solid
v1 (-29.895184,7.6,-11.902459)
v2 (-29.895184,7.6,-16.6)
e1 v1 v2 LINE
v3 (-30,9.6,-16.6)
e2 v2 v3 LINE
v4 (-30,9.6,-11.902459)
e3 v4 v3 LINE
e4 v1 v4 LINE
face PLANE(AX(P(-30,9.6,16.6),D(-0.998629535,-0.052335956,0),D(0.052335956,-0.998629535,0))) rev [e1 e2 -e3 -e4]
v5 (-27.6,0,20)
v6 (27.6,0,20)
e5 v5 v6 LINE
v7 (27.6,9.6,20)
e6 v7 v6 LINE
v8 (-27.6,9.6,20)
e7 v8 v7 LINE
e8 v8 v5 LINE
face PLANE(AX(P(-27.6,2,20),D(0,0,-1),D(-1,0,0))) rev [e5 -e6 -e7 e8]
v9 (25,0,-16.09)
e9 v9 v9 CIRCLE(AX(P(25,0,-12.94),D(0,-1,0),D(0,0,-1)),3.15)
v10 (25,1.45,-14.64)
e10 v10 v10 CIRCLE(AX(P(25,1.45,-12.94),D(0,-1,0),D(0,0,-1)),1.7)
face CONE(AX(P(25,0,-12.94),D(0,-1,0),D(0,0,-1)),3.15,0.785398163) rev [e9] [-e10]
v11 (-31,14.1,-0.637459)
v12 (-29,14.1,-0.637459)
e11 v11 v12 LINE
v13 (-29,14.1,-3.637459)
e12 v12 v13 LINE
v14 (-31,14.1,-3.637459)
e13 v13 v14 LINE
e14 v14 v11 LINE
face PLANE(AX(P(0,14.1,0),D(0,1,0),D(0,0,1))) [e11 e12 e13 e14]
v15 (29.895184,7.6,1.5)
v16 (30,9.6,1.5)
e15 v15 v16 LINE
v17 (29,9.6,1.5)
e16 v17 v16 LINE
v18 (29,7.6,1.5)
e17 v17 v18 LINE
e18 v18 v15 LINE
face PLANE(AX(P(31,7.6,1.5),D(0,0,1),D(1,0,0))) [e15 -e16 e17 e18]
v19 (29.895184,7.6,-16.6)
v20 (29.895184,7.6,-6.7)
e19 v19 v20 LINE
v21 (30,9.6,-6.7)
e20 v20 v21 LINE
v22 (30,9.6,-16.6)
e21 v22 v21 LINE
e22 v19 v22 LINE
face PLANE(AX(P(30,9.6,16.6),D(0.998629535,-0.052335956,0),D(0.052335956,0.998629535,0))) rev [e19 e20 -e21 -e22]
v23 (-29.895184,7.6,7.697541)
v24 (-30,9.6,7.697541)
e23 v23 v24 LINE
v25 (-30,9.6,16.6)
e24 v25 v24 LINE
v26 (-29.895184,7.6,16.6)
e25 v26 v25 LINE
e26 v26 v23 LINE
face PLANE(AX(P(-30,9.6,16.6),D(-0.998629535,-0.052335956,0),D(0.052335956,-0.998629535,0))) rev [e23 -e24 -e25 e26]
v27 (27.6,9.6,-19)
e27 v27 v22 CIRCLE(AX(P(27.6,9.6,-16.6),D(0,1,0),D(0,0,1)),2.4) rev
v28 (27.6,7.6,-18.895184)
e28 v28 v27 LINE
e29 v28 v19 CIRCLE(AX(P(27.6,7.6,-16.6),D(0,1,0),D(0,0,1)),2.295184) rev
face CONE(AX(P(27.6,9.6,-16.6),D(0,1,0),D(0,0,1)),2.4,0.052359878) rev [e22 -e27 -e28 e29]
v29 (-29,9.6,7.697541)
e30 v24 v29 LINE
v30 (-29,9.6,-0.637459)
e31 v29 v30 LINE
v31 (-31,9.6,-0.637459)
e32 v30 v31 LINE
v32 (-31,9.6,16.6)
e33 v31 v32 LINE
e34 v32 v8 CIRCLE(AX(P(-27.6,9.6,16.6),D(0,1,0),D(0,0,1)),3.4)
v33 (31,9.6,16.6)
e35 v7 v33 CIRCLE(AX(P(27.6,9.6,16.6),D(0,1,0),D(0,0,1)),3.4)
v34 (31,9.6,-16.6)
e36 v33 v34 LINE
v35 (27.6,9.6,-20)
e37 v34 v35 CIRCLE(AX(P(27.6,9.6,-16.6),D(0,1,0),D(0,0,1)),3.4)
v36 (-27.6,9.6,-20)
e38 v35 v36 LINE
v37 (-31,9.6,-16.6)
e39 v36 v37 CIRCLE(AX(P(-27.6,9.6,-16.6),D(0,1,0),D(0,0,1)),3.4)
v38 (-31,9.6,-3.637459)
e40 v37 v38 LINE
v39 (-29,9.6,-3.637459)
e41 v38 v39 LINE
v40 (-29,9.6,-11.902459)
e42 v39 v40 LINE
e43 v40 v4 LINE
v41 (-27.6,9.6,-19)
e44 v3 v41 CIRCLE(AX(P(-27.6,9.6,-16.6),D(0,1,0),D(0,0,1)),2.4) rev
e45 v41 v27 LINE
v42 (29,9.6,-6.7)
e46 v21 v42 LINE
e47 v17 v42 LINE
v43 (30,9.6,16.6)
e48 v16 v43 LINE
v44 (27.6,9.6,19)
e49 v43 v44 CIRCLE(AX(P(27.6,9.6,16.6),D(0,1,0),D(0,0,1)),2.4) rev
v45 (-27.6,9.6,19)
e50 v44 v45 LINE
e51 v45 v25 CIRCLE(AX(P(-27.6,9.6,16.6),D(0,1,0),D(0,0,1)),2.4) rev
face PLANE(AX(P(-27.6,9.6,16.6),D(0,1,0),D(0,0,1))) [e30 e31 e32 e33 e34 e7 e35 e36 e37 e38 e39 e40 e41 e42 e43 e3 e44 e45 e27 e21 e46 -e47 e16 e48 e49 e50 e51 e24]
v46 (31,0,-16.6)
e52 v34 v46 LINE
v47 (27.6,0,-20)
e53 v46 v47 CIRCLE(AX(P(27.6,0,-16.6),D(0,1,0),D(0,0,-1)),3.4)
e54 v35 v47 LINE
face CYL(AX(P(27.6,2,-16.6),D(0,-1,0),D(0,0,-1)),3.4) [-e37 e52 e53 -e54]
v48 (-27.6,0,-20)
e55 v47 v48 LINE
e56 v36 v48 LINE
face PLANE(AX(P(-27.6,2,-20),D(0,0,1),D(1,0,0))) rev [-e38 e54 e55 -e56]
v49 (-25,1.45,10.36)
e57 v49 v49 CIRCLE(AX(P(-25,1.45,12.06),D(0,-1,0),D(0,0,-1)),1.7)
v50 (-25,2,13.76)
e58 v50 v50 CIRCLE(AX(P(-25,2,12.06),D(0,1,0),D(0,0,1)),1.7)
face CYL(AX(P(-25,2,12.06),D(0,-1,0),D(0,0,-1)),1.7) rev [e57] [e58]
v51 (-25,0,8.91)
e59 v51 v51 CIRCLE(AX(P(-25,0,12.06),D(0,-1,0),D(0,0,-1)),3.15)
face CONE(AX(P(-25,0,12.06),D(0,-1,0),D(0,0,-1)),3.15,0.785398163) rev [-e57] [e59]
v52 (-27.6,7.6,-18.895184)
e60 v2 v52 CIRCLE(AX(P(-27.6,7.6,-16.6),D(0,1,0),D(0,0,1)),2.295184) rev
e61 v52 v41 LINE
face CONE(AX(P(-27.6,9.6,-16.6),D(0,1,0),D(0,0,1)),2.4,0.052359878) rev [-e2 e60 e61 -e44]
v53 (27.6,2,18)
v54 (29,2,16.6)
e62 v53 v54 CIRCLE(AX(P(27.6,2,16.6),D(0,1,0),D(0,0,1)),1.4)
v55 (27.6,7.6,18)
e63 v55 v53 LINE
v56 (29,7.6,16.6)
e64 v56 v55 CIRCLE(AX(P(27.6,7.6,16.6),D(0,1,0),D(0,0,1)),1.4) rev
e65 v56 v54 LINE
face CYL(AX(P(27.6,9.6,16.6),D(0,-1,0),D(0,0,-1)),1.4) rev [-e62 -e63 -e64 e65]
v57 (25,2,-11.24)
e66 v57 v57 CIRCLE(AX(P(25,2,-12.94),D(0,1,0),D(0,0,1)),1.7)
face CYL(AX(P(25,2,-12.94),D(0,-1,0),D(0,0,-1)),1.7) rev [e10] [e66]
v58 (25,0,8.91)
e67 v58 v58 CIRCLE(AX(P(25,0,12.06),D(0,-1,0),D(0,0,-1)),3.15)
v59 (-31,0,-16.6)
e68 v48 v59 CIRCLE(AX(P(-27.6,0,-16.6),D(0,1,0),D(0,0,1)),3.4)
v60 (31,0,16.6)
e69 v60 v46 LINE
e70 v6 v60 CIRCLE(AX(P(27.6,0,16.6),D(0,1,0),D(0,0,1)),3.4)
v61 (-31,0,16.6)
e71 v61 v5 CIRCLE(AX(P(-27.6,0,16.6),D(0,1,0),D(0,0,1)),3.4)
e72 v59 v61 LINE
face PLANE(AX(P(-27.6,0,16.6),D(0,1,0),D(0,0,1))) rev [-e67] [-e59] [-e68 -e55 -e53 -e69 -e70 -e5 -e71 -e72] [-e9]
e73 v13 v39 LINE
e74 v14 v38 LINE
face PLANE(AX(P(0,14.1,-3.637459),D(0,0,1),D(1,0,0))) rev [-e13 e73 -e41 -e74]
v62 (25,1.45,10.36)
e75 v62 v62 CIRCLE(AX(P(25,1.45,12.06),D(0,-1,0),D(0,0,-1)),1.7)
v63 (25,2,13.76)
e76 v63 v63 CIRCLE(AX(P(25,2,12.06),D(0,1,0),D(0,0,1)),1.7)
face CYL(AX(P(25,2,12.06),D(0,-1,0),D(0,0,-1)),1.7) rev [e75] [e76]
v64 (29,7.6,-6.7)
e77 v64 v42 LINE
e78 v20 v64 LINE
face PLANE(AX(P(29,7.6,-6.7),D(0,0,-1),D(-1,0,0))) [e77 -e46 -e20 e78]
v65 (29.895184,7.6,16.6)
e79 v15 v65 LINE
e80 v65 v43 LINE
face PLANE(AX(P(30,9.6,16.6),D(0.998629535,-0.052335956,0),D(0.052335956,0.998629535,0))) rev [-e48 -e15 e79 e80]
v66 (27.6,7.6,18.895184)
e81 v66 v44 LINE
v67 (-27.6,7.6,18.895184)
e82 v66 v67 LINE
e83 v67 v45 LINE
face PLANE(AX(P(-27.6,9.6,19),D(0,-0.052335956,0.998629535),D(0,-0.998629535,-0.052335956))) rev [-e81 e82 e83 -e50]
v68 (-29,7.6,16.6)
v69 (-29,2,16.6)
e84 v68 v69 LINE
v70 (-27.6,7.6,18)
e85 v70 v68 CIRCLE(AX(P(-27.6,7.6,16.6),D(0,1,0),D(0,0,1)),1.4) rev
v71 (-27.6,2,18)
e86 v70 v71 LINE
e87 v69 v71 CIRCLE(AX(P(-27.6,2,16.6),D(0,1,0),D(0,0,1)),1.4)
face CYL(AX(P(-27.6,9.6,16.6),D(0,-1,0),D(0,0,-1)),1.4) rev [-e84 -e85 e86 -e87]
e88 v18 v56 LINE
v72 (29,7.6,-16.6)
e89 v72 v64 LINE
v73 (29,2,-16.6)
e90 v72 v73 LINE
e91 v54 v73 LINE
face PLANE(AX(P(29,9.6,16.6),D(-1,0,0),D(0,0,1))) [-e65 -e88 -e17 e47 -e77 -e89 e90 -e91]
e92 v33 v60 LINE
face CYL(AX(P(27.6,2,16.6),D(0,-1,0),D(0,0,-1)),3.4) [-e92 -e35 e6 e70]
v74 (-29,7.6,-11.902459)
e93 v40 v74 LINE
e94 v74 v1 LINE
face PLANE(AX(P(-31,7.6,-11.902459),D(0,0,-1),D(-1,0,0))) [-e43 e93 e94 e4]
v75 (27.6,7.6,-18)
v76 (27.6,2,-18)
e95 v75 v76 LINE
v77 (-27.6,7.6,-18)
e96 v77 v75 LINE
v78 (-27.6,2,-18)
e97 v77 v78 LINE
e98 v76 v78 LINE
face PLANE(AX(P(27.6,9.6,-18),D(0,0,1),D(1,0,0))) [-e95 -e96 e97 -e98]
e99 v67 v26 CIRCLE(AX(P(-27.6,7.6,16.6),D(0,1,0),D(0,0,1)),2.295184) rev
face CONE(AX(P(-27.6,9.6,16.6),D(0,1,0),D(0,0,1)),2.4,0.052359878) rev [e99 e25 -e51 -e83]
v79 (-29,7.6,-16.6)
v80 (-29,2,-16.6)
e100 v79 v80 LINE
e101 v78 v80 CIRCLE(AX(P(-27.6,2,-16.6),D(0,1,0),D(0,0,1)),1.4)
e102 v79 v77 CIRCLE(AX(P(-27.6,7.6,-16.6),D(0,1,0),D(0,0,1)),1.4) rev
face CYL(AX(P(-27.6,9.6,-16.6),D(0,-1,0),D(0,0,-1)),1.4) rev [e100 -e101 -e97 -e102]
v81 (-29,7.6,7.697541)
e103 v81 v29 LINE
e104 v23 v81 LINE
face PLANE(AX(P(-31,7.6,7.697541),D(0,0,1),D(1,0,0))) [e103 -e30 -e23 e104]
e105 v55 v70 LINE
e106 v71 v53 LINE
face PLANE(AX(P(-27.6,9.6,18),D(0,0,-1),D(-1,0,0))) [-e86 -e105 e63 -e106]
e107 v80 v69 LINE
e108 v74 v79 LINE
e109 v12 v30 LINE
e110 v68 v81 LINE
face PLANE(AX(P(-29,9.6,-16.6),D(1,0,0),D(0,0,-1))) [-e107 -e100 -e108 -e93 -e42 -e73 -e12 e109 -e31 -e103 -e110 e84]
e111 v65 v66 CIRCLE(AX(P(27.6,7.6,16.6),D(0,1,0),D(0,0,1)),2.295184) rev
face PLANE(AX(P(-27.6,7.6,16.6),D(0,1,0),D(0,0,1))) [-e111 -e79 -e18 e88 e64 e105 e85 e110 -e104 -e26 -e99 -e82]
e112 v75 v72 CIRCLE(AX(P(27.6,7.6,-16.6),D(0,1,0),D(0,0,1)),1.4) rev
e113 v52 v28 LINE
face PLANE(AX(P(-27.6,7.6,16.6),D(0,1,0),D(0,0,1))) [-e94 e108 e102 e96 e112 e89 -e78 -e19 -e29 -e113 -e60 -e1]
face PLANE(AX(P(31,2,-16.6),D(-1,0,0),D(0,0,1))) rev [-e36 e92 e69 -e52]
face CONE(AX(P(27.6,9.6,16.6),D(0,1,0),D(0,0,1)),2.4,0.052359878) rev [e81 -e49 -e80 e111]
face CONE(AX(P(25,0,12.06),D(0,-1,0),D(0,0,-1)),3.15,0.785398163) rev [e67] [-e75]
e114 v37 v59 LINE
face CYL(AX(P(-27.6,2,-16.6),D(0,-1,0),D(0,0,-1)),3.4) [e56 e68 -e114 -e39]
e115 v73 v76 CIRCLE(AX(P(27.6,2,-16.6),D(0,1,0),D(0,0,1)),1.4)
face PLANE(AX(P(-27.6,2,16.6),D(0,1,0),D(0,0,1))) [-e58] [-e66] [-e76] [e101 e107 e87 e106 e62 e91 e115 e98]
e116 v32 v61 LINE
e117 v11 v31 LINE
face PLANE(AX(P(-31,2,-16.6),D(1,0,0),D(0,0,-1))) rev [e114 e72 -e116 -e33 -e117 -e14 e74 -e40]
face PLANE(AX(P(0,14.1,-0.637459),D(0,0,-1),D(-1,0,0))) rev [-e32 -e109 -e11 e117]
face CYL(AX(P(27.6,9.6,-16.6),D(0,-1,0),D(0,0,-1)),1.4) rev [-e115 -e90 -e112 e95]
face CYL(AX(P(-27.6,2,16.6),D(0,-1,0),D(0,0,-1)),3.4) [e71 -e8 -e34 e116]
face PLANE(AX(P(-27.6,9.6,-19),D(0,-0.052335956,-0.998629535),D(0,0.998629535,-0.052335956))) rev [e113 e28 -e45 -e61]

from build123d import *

# Parameters (mm, degrees)
SKETCH1_R                                       = 1.7
BOSS_EXTRUDE1_DEPTH                             = 2
BOSS_EXTRUDE2_DEPTH                             = 7.6
SKETCH3_W                                       = 2
SKETCH3_H                                       = 3
BOSS_EXTRUDE3_DEPTH                             = 4.5
CSK_FOR_M3_FLAT_HEAD_MACHINE_SCREW1_D           = 3.4
CSK_FOR_M3_FLAT_HEAD_MACHINE_SCREW1_CSINK_D     = 6.3
CSK_FOR_M3_FLAT_HEAD_MACHINE_SCREW1_CSINK_ANGLE = 90
SKETCH6_W                                       = 2
SKETCH6_H                                       = 8.265
SKETCH6_H_2                                     = 8.335
SKETCH6_H_3                                     = 3.6
CUT_EXTRUDE1_DEPTH                              = 1
GROOVE2_START                                   = -18
GROOVE2_OUTLINE_W                               = 58
GROOVE2_OUTLINE_H                               = 2
GROOVE2_DEPTH                                   = 36.20069
GROOVE2_START_2                                 = 7.697541275
GROOVE2_2_DEPTH                                 = 8.902458725
GROOVE2_START_3                                 = -16.6
GROOVE2_3_DEPTH                                 = 9.9
GROOVE2_START_4                                 = 1.5
GROOVE2_4_DEPTH                                 = 6.197541275
GROOVE2_5_DEPTH                                 = 4.697541275
BOSS_EXTRUDE4_DEPTH                             = 1


with BuildPart() as part:
    # Sketch1 → Boss-Extrude1 (new body)
    with BuildSketch(Plane(origin=(0, 0, 0), x_dir=(1, 0, 0), z_dir=(0, 1, 0))):
        with BuildLine():
            Line((-27.6, 20), (27.6, 20))
            ThreePointArc((27.6, 20), (30.004163056, 19.004163056), (31, 16.6))
            Line((31, 16.6), (31, -16.6))
            ThreePointArc((31, -16.6), (30.004163056, -19.004163056), (27.6, -20))
            Line((27.6, -20), (-27.6, -20))
            ThreePointArc((-27.6, -20), (-30.004163056, -19.004163056), (-31, -16.6))
            Line((-31, -16.6), (-31, 16.6))
            ThreePointArc((-31, 16.6), (-30.004163056, 19.004163056), (-27.6, 20))
        make_face()
        with Locations(Location((-25, -12.06, 0), (0, 0, 270))):
            Circle(SKETCH1_R, mode=Mode.SUBTRACT)
        with Locations(Location((25, -12.06, 0), (0, 0, 270))):
            Circle(SKETCH1_R, mode=Mode.SUBTRACT)
        with Locations(Location((25, 12.94, 0), (0, 0, 270))):
            Circle(SKETCH1_R, mode=Mode.SUBTRACT)
    extrude(amount=BOSS_EXTRUDE1_DEPTH)

    # Sketch2 → Boss-Extrude2 (add)
    with BuildSketch(Plane(origin=(0, 2, 0), x_dir=(1, 0, 0), z_dir=(0, 1, 0))):
        with BuildLine():
            Line((-27.6, -20), (27.6, -20))
            ThreePointArc((27.6, -20), (30.004163056, -19.004163056), (31, -16.6))
            Line((31, -16.6), (31, 16.6))
            ThreePointArc((31, 16.6), (30.004163056, 19.004163056), (27.6, 20))
            Line((27.6, 20), (-27.6, 20))
            ThreePointArc((-27.6, 20), (-30.004163056, 19.004163056), (-31, 16.6))
            Line((-31, 16.6), (-31, -16.6))
            ThreePointArc((-31, -16.6), (-30.004163056, -19.004163056), (-27.6, -20))
        make_face()
        with BuildLine():
            Line((27.6, 18), (-27.6, 18))
            ThreePointArc((-27.6, 18), (-28.589949494, 17.589949494), (-29, 16.6))
            Line((-29, 16.6), (-29, -16.6))
            ThreePointArc((-29, -16.6), (-28.589949494, -17.589949494), (-27.6, -18))
            Line((-27.6, -18), (27.6, -18))
            ThreePointArc((27.6, -18), (28.589949494, -17.589949494), (29, -16.6))
            Line((29, -16.6), (29, 16.6))
            ThreePointArc((29, 16.6), (28.589949494, 17.589949494), (27.6, 18))
        make_face(mode=Mode.SUBTRACT)
    extrude(amount=BOSS_EXTRUDE2_DEPTH)

    # Sketch3 → Boss-Extrude3 (add)
    with BuildSketch(Plane(origin=(0, 9.6, 0), x_dir=(1, 0, 0), z_dir=(0, 1, 0))):
        with Locations((-30, 2.137458725)):
            Rectangle(SKETCH3_W, SKETCH3_H)
    extrude(amount=BOSS_EXTRUDE3_DEPTH)

    # CSK for M3 Flat Head Machine Screw1 (through all)
    with Locations(Plane(origin=(-25, 0, 12.06), x_dir=(0, 0, -1), z_dir=(0, -1, 0))):
        with Locations((0, 0), (0, 50), (25, 50)):
            CounterSinkHole(CSK_FOR_M3_FLAT_HEAD_MACHINE_SCREW1_D / 2, CSK_FOR_M3_FLAT_HEAD_MACHINE_SCREW1_CSINK_D / 2, counter_sink_angle=CSK_FOR_M3_FLAT_HEAD_MACHINE_SCREW1_CSINK_ANGLE)

    # Sketch6 → Cut-Extrude1 (cut)
    with BuildSketch(Plane(origin=(0, 9.6, 0), x_dir=(1, 0, 0), z_dir=(0, 1, 0))):
        with Locations((-30, 7.769958725)):
            Rectangle(SKETCH6_W, SKETCH6_H)
        with Locations((-30, -3.530041275)):
            Rectangle(SKETCH6_W, SKETCH6_H_2)
        with Locations((30, 4.9)):
            Rectangle(SKETCH6_W, SKETCH6_H_3)
        with Locations((30, 0.3)):
            Rectangle(SKETCH6_W, SKETCH6_H_3)
    extrude(amount=-CUT_EXTRUDE1_DEPTH, mode=Mode.SUBTRACT)

    # Groove2: read off the stored shape, not the designer's step
    # Groove2 outline → Groove2 (cut)
    with BuildSketch(Plane.XY.offset(GROOVE2_START)):
        with Locations((0, 8.6)):
            Rectangle(GROOVE2_OUTLINE_W, GROOVE2_OUTLINE_H)
    extrude(amount=GROOVE2_DEPTH, mode=Mode.SUBTRACT)

    # Groove2 2 outline → Groove2 2 (cut)
    with BuildSketch(Plane.XY.offset(GROOVE2_START_2)):
        Polygon((29, 7.6), (29.895184441, 7.6), (30, 9.6), (29, 9.6), align=None)
        Polygon((-29.895184441, 7.6), (-29, 7.6), (-29, 9.6), (-30, 9.6), align=None)
    extrude(amount=GROOVE2_2_DEPTH, mode=Mode.SUBTRACT)

    # Groove2 3 outline → Groove2 3 (cut)
    with BuildSketch(Plane.XY.offset(GROOVE2_START_3)):
        Polygon((29, 7.6), (29.895184441, 7.6), (30, 9.6), (29, 9.6), align=None)
    extrude(amount=GROOVE2_3_DEPTH, mode=Mode.SUBTRACT)

    # Groove2 4 outline → Groove2 4 (cut)
    with BuildSketch(Plane.XY.offset(GROOVE2_START_4)):
        Polygon((29, 7.6), (29.895184441, 7.6), (30, 9.6), (29, 9.6), align=None)
    extrude(amount=GROOVE2_4_DEPTH, mode=Mode.SUBTRACT)

    # Groove2 5 outline → Groove2 5 (cut)
    with BuildSketch(Plane.XY.offset(GROOVE2_START_3)):
        Polygon((-29.895184441, 7.6), (-29, 7.6), (-29, 9.6), (-30, 9.6), align=None)
    extrude(amount=GROOVE2_5_DEPTH, mode=Mode.SUBTRACT)

    # Groove2 6: loft between two sections, ruled curve by curve
    groove2_6_from = [
        Edge.make_three_point_arc((-29.895184441, 7.6, 16.6), (-29.222940483, 7.6, 18.222940483), (-27.6, 7.6, 18.895184441)),
        Edge.make_three_point_arc((27.6, 7.6, 18.895184441), (29.222940483, 7.6, 18.222940483), (29.895184441, 7.6, 16.6)),
        Edge.make_line((27.6, 7.6, 18.895184441), (-27.6, 7.6, 18.895184441)),
        Edge.make_line((29.895184441, 7.6, 16.6), (-29.895184441, 7.6, 16.6)),
    ]
    groove2_6_to = [
        Edge.make_three_point_arc((-30, 9.6, 16.6), (-29.297056275, 9.6, 18.297056275), (-27.6, 9.6, 19)),
        Edge.make_three_point_arc((27.6, 9.6, 19), (29.297056275, 9.6, 18.297056275), (30, 9.6, 16.6)),
        Edge.make_line((27.6, 9.6, 19), (-27.6, 9.6, 19)),
        Edge.make_line((30, 9.6, 16.6), (-30, 9.6, 16.6)),
    ]
    groove2_6 = Solid(Shell([*[Face.make_surface_from_curves(groove2_6_from[k], groove2_6_to[k]) for k in range(4)], Face(Wire(groove2_6_from)), Face(Wire(groove2_6_to))]))
    add(groove2_6, mode=Mode.SUBTRACT)

    # Groove2 7: loft between two sections, ruled curve by curve
    groove2_7_from = [
        Edge.make_three_point_arc((29.895184441, 7.6, -16.6), (29.222940483, 7.6, -18.222940483), (27.6, 7.6, -18.895184441)),
        Edge.make_three_point_arc((-27.6, 7.6, -18.895184441), (-29.222940483, 7.6, -18.222940483), (-29.895184441, 7.6, -16.6)),
        Edge.make_line((-27.6, 7.6, -18.895184441), (27.6, 7.6, -18.895184441)),
        Edge.make_line((-29.895184441, 7.6, -16.6), (29.895184441, 7.6, -16.6)),
    ]
    groove2_7_to = [
        Edge.make_three_point_arc((30, 9.6, -16.6), (29.297056275, 9.6, -18.297056275), (27.6, 9.6, -19)),
        Edge.make_three_point_arc((-27.6, 9.6, -19), (-29.297056275, 9.6, -18.297056275), (-30, 9.6, -16.6)),
        Edge.make_line((-27.6, 9.6, -19), (27.6, 9.6, -19)),
        Edge.make_line((-30, 9.6, -16.6), (30, 9.6, -16.6)),
    ]
    groove2_7 = Solid(Shell([*[Face.make_surface_from_curves(groove2_7_from[k], groove2_7_to[k]) for k in range(4)], Face(Wire(groove2_7_from)), Face(Wire(groove2_7_to))]))
    add(groove2_7, mode=Mode.SUBTRACT)

    # Sketch7 → Boss-Extrude4 (add)
    with BuildSketch(Plane(origin=(0, 8.6, 0), x_dir=(1, 0, 0), z_dir=(0, 1, 0))):
        Polygon((-31, 11.902458725), (-31, 3.637458725), (-29, 3.637458725), (-29, 11.902458725), (-29.947592221, 11.902458725), align=None)
        Polygon((-29, -7.697541275), (-29, 0.637458725), (-31, 0.637458725), (-31, -7.697541275), (-29.947592221, -7.697541275), align=None)
        Polygon((29, 3.1), (31, 3.1), (31, 6.7), (29.947592221, 6.7), (29, 6.7), align=None)
        Polygon((31, 2.1), (29, 2.1), (29, -1.5), (29.947592221, -1.5), (31, -1.5), align=None)
    extrude(amount=BOSS_EXTRUDE4_DEPTH)


solid = part.part
